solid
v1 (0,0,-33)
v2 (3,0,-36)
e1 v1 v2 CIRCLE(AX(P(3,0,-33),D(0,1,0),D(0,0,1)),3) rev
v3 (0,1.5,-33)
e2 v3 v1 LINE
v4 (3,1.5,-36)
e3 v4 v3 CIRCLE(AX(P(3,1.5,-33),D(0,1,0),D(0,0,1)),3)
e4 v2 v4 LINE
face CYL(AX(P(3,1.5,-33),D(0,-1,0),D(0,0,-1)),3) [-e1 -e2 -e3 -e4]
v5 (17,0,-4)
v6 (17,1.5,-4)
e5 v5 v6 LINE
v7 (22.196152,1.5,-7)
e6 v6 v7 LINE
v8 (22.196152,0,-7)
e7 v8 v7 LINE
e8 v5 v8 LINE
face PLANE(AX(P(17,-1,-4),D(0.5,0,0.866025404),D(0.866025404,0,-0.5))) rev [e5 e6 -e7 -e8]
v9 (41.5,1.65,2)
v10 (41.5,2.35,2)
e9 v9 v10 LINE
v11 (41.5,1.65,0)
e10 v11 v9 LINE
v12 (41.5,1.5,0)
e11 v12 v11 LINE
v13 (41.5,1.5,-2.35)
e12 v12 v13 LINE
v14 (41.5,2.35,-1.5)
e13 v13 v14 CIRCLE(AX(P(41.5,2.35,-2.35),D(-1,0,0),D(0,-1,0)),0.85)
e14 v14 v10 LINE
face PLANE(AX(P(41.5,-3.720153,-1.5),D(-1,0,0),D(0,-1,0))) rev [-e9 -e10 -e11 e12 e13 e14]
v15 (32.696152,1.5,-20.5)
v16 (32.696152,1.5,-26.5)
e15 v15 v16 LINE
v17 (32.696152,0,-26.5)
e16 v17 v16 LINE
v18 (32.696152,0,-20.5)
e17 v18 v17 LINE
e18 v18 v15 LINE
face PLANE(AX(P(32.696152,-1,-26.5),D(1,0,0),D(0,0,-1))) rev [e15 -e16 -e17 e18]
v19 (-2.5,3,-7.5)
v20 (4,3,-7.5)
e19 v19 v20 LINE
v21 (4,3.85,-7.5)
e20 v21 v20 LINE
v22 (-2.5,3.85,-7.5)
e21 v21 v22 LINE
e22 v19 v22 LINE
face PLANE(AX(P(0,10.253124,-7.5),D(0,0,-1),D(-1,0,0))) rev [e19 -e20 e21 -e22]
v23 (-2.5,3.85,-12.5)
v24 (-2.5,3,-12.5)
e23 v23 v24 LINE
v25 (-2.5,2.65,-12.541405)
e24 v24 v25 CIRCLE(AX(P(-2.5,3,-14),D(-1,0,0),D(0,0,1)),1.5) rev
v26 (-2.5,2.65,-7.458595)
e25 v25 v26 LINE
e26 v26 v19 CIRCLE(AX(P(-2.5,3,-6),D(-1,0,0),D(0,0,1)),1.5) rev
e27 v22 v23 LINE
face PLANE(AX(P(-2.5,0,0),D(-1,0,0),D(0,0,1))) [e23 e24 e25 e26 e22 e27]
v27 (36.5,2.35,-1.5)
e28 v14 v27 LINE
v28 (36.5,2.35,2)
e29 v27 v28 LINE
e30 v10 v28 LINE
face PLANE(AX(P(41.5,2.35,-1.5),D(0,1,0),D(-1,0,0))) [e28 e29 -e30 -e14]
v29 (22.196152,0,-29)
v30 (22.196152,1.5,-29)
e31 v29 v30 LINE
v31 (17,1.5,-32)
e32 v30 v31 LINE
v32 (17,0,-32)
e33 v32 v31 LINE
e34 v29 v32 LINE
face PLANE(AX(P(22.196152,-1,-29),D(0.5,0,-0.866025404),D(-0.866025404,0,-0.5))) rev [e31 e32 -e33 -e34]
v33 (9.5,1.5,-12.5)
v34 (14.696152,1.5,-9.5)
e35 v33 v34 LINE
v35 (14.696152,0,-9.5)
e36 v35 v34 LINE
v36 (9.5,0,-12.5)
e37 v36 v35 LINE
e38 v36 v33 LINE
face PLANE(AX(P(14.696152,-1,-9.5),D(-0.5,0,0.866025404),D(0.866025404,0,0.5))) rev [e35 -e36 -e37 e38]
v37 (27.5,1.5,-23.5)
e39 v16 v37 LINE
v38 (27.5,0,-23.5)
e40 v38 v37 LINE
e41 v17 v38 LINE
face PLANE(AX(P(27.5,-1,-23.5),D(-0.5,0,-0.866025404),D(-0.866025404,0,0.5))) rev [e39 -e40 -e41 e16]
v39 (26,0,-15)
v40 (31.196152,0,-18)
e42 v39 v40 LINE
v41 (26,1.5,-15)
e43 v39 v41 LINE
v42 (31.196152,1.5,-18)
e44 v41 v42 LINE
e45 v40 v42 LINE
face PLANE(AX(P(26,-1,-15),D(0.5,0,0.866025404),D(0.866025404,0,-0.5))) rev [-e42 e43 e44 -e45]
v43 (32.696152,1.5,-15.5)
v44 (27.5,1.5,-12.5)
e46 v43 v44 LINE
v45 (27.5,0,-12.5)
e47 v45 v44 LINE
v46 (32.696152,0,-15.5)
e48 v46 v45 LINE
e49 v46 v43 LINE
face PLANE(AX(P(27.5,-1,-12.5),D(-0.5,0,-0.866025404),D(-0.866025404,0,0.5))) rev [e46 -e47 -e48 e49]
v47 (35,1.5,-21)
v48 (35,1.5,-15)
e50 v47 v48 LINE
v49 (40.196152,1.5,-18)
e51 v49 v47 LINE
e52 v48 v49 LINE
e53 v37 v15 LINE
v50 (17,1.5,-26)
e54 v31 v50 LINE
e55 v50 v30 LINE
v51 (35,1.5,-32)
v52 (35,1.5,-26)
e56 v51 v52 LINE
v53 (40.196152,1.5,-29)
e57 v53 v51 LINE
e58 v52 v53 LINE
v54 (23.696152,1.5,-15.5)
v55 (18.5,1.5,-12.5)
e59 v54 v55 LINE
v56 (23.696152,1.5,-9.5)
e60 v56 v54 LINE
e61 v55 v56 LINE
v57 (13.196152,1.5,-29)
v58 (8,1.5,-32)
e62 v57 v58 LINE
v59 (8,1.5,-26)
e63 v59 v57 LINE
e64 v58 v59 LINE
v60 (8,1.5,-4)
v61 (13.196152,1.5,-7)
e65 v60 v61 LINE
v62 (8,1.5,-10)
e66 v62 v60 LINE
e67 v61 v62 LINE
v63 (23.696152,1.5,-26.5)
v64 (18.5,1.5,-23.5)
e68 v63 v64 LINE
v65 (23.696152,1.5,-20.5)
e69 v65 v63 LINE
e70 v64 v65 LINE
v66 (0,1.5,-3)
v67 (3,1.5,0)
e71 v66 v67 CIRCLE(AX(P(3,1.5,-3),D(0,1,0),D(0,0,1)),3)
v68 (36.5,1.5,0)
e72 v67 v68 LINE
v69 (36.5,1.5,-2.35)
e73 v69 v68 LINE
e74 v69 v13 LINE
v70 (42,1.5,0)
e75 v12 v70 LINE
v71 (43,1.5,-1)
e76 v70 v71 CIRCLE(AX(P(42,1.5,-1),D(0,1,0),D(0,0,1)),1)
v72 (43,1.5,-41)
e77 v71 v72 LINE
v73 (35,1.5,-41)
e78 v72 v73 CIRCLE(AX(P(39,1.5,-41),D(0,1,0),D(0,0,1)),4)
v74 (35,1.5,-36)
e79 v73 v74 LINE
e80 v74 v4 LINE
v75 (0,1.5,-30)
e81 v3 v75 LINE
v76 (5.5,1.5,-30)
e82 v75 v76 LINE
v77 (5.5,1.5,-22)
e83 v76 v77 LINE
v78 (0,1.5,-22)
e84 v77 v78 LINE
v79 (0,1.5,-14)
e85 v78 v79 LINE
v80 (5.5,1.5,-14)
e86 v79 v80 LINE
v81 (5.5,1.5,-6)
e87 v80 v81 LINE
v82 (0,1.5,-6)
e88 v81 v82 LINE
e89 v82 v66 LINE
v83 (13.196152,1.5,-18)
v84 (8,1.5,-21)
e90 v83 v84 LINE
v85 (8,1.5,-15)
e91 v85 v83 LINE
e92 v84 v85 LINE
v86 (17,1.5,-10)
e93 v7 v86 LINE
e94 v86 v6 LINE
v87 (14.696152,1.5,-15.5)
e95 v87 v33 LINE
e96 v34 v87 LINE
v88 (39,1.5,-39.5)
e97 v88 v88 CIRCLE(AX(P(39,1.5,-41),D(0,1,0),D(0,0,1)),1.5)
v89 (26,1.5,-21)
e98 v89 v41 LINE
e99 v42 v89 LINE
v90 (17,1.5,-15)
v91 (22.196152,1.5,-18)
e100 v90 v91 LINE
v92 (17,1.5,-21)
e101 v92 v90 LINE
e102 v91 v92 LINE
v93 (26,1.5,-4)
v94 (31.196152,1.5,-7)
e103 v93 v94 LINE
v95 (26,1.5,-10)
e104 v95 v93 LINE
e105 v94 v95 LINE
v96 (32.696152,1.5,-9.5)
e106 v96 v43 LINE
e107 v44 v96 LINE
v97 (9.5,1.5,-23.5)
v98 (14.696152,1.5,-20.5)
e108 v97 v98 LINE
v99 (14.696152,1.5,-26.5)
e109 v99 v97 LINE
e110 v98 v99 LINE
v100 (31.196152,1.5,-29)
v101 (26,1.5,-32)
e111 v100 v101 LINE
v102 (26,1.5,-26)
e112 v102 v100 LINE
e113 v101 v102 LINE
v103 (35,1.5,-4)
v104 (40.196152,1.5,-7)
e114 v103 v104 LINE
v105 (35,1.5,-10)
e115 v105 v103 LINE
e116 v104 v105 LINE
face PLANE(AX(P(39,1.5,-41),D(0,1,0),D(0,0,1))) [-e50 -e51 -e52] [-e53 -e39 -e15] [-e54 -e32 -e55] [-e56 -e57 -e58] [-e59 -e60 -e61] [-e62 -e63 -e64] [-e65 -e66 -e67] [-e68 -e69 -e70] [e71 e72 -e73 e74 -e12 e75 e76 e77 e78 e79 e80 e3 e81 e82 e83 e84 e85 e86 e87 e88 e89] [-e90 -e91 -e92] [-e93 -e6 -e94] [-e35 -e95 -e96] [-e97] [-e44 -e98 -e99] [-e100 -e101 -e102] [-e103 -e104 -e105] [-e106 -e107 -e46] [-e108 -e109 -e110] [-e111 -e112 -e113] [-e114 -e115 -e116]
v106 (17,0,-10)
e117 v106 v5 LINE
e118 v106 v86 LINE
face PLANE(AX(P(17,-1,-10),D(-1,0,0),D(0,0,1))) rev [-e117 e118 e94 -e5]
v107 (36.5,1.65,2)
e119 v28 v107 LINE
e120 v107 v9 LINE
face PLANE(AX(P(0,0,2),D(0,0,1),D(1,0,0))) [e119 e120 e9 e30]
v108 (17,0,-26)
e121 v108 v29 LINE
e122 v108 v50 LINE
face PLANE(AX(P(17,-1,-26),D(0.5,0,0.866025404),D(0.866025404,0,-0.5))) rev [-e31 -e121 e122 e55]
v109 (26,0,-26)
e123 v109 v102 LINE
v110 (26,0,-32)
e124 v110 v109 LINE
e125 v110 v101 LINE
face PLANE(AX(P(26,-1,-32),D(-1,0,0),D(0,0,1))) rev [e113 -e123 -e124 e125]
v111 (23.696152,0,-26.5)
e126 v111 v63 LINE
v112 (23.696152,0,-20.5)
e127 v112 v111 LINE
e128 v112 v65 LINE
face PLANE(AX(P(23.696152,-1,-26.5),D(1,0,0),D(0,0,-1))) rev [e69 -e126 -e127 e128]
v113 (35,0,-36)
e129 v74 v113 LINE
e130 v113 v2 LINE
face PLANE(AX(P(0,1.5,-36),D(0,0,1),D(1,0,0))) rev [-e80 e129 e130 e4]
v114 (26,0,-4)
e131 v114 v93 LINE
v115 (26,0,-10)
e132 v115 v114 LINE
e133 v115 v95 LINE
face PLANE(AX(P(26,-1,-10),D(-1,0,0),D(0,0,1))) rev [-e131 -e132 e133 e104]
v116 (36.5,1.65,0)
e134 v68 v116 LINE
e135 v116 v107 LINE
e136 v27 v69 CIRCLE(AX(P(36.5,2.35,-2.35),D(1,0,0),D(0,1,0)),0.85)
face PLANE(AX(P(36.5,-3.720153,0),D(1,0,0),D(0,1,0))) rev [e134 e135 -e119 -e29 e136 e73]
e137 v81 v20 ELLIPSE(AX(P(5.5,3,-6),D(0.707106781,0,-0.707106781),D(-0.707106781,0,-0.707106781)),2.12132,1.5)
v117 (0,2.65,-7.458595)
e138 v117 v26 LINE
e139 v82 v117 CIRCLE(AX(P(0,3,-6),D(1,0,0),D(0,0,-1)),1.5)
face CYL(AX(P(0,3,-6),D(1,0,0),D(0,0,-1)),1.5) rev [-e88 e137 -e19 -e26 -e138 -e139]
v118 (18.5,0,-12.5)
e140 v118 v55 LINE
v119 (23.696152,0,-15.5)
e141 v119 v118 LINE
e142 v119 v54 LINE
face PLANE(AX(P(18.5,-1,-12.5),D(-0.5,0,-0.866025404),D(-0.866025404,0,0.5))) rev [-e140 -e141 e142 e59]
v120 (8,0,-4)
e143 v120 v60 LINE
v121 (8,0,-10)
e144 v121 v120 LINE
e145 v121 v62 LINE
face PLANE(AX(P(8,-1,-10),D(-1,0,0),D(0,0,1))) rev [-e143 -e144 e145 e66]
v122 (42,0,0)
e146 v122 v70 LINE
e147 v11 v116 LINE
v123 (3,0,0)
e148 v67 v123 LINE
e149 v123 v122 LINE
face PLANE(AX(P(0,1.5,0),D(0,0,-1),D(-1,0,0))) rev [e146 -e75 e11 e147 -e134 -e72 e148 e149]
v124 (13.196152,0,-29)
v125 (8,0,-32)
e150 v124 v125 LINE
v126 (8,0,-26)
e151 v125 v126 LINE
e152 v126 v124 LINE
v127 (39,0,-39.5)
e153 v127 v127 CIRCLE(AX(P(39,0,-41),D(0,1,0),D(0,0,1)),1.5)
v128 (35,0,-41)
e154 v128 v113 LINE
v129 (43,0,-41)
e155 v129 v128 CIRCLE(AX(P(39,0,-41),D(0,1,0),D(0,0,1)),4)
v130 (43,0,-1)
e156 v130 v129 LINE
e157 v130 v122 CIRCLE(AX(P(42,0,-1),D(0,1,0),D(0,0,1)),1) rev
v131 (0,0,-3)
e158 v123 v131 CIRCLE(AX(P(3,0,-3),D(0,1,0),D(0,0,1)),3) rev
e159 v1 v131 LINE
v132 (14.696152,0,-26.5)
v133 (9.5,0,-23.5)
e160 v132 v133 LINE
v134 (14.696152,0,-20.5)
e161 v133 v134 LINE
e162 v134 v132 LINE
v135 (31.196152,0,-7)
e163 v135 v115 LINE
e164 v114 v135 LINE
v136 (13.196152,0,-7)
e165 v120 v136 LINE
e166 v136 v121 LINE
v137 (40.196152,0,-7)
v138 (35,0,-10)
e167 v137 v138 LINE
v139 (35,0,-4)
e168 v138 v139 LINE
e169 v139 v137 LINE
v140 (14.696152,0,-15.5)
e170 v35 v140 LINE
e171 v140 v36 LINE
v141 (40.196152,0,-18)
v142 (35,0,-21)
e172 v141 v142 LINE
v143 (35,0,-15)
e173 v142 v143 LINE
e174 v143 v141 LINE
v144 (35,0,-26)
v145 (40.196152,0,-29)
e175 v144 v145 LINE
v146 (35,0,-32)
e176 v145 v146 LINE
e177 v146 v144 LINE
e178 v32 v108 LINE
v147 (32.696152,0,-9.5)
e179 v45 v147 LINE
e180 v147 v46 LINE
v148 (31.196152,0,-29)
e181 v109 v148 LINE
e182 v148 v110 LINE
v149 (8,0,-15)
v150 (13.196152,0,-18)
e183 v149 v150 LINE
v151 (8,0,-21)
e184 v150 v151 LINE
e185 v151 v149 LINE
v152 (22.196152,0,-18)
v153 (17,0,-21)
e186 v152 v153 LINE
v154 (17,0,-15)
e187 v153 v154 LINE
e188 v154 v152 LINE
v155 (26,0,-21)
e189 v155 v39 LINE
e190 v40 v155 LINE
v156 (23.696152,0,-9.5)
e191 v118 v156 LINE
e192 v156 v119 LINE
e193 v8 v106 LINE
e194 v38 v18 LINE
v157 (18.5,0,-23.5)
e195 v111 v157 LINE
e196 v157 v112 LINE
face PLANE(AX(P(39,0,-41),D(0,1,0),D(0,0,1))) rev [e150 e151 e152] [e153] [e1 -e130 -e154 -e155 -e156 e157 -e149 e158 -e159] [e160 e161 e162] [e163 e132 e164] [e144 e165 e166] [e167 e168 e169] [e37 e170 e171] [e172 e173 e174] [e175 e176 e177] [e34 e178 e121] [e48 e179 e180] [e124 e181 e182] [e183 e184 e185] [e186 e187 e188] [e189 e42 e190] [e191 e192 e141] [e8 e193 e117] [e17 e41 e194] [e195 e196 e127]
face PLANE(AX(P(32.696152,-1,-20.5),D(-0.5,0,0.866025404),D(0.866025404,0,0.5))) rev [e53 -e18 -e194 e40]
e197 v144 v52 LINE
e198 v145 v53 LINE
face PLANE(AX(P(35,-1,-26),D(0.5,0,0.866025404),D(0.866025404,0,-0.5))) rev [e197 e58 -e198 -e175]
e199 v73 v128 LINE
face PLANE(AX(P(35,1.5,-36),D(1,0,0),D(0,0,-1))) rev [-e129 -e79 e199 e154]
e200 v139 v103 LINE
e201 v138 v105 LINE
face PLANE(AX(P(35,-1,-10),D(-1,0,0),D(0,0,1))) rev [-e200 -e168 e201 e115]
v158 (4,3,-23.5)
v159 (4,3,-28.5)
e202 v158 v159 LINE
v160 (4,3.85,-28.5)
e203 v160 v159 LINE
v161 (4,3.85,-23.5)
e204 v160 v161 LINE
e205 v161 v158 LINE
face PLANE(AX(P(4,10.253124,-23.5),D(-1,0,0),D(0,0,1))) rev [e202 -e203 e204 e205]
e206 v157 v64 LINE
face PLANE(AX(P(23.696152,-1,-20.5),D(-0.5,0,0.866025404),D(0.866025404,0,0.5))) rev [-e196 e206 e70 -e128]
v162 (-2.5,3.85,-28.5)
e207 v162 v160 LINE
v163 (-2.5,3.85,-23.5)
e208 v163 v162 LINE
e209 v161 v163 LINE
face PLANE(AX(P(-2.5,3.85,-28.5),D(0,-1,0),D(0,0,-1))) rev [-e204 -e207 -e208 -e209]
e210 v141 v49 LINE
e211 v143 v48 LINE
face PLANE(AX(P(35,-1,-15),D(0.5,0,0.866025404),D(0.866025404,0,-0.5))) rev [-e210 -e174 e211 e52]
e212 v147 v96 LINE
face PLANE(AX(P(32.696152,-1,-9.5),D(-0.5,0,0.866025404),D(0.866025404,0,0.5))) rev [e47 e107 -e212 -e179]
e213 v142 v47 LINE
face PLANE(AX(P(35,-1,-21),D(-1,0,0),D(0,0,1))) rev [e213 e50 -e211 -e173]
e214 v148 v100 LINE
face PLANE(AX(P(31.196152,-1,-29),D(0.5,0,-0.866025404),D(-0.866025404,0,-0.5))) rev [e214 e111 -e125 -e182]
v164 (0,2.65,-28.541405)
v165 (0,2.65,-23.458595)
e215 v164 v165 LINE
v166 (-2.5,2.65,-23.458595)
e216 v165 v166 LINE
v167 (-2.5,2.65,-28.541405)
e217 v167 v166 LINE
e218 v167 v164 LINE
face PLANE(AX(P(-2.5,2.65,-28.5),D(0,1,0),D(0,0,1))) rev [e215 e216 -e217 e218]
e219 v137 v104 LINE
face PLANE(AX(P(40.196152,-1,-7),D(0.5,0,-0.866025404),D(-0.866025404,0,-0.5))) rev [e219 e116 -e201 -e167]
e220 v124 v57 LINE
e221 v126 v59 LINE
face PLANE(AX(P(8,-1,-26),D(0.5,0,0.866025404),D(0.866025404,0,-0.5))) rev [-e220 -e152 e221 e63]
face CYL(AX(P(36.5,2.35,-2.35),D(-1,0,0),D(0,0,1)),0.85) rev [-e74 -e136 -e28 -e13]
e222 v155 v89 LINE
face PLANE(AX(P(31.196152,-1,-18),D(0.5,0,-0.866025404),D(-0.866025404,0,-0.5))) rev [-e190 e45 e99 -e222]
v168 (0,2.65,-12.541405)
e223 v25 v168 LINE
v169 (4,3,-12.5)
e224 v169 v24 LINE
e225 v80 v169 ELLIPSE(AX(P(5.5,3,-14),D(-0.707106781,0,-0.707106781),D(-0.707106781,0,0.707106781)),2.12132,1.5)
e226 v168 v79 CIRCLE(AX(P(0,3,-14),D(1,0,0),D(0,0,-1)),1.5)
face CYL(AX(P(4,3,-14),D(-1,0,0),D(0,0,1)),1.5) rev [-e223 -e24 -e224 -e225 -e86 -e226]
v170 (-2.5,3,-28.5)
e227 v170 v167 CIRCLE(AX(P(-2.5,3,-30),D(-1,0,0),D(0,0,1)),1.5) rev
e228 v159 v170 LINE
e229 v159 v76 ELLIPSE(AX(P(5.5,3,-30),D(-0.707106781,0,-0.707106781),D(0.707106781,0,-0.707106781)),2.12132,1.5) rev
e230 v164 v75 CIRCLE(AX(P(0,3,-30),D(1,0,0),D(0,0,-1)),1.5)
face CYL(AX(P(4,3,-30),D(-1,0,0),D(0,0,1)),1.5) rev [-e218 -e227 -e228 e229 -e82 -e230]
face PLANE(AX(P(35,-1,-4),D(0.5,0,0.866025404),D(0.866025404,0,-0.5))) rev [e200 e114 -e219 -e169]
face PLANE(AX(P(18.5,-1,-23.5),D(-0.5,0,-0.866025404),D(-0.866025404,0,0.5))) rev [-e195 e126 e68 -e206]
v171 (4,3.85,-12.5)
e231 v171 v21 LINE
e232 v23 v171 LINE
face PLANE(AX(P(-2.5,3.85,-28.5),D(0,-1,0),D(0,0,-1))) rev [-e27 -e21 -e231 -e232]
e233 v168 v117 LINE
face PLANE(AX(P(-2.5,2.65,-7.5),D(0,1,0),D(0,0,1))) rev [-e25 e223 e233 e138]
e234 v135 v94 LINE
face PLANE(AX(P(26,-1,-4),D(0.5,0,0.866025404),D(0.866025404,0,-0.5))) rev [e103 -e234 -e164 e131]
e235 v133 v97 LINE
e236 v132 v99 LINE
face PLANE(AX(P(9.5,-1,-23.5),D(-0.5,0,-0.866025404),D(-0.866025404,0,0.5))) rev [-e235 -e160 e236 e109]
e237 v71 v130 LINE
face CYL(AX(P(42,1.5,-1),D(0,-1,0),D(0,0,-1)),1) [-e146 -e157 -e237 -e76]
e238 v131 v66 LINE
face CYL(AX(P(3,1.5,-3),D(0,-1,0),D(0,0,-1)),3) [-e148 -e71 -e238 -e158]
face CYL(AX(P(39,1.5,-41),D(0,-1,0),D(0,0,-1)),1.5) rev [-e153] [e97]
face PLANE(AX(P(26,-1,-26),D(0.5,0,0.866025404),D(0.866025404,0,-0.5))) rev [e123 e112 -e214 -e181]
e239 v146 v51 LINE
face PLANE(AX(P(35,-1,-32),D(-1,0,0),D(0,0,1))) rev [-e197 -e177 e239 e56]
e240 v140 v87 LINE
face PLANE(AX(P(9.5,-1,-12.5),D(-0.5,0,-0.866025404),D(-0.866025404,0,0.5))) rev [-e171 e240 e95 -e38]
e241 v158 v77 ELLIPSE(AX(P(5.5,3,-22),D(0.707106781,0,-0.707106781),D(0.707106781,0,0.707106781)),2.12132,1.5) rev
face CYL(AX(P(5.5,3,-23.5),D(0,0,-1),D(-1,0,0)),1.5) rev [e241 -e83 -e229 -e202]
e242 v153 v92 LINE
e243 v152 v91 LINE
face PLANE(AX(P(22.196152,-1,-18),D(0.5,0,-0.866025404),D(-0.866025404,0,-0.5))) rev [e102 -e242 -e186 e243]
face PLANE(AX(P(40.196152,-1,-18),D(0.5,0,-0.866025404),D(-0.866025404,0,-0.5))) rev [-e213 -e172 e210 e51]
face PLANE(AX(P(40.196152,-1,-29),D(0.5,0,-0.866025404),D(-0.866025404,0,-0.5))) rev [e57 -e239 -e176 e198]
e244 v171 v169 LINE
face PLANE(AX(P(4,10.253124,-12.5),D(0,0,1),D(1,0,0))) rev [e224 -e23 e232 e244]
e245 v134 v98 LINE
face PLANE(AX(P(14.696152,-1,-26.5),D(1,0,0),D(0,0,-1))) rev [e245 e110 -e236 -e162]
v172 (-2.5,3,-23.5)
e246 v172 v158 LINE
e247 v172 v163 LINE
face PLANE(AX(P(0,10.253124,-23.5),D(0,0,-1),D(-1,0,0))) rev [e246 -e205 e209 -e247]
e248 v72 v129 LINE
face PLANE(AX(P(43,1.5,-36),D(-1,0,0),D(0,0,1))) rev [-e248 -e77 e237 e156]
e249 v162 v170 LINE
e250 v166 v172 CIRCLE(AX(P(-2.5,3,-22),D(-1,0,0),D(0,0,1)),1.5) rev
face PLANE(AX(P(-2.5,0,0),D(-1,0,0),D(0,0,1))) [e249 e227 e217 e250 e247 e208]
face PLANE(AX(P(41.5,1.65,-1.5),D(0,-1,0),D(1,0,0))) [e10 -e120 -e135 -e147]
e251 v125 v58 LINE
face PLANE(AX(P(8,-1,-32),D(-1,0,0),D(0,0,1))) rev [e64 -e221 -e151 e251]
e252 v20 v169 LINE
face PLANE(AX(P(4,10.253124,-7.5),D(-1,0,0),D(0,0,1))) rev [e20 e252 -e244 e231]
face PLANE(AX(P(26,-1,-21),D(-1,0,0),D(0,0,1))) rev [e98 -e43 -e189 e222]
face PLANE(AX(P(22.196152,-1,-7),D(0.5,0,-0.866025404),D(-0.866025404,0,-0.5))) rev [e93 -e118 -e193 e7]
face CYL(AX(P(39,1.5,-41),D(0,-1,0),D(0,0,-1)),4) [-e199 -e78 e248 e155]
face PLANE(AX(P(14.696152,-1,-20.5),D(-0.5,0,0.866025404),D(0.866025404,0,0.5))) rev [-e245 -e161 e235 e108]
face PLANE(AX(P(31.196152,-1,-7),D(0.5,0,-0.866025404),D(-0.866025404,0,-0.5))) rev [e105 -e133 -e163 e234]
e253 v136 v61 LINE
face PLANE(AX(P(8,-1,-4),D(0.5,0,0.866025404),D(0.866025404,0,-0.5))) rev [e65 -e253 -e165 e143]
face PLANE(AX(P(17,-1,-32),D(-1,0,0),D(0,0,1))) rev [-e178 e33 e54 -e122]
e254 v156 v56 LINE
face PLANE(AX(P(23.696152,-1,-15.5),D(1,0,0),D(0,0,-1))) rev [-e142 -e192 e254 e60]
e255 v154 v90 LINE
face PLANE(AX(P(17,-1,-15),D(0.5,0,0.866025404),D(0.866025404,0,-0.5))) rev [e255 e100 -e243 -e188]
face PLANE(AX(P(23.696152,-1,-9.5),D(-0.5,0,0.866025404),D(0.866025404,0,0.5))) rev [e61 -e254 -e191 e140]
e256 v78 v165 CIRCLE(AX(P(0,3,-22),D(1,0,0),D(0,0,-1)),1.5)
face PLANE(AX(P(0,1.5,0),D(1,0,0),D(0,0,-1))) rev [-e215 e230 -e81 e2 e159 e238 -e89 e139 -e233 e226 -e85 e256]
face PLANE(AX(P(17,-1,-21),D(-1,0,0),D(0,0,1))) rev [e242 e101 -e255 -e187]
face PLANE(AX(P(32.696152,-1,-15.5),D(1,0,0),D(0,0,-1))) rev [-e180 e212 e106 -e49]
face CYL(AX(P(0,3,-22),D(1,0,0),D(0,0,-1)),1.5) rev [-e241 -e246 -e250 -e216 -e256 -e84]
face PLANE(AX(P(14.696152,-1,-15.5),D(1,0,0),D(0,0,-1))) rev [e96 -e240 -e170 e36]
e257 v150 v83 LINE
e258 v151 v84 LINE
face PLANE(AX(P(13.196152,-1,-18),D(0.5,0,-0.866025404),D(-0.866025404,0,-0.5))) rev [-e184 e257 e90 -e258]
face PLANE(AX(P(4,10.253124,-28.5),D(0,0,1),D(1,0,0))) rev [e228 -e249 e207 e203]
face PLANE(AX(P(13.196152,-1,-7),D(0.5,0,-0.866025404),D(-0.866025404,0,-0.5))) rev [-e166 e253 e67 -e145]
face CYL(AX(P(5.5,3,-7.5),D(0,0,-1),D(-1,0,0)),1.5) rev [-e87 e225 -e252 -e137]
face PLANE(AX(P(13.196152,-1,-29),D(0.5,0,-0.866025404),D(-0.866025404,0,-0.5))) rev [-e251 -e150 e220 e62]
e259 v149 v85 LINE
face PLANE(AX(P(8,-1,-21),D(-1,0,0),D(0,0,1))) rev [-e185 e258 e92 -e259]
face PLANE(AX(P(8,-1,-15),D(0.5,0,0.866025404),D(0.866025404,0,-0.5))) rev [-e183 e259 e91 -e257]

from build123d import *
from OCP.BRepFilletAPI import BRepFilletAPI_MakeFillet

# Parameters (mm, degrees)
SKETCH1_R                = 1.5
BOSS_EXTRUDE1_DEPTH      = 1.5
BOSS_EXTRUDE2_DEPTH      = 2
BOSS_EXTRUDE2_DEPTH_BACK = 1.5
SKETCH3_W                = 5
SKETCH3_H                = 0.7
SKETCH4_W                = 5
SKETCH4_H                = 1.5
BOSS_EXTRUDE3_DEPTH      = 0.15
FILLET2_R                = 0.85
SKETCH5_W                = 5
SKETCH5_H                = 1.2
BOSS_EXTRUDE4_DEPTH      = 2.5
BOSS_EXTRUDE4_2_DEPTH    = 2.5
SKETCH6_W                = 4
SKETCH6_H                = 5
BOSS_EXTRUDE5_DEPTH      = 2.35
FILLET3_R                = 1.5
CUT_EXTRUDE1_DEPTH       = 2.5
FILLET4_R1               = 3
FILLET4_R2               = 1


with BuildPart() as part:
    # Sketch1 → Boss-Extrude1 (new body)
    with BuildSketch(Plane(origin=(0, 0, 0), x_dir=(1, 0, 0), z_dir=(0, 1, 0))):
        with BuildLine():
            Line((0, 0), (43, 0))
            Line((43, 0), (43, 36))
            Line((43, 36), (43, 41))
            ThreePointArc((43, 41), (39, 45), (35, 41))
            Line((35, 41), (35, 36))
            Line((35, 36), (0, 36))
            Line((0, 36), (0, 0))
        make_face()
        with Locations(Location((39, 41, 0), (0, 0, 270))):
            Circle(SKETCH1_R, mode=Mode.SUBTRACT)
    extrude(amount=BOSS_EXTRUDE1_DEPTH)



with BuildPart() as body_2:
    # Sketch3 → Boss-Extrude2 (new, two sides: drawn at the far end of the back side and taken through both)
    with BuildSketch(Plane.XY.offset(-BOSS_EXTRUDE2_DEPTH_BACK)):
        with Locations((39, 2)):
            Rectangle(SKETCH3_W, SKETCH3_H)
    extrude(amount=BOSS_EXTRUDE2_DEPTH + BOSS_EXTRUDE2_DEPTH_BACK)


with BuildPart() as part_1:
    add(part.part)

    add(body_2.part)  # Boss-Extrude3 merges body 2
    # Sketch4 → Boss-Extrude3 (add)
    with BuildSketch(Plane.XZ.offset(-1.65)):
        with Locations((39, -0.75)):
            Rectangle(SKETCH4_W, SKETCH4_H)
    extrude(amount=BOSS_EXTRUDE3_DEPTH)

    # Fillet2
    fillet2_edges = [part_1.edges().sort_by_distance(p)[0] for p in [
        (39, 1.5, -1.5),
    ]]
    fillet(fillet2_edges, radius=FILLET2_R - 0.0001)  # a hair under: the kernel refuses the full size



with BuildPart() as body_2_2:
    # Sketch5 → Boss-Extrude4 (new body)
    with BuildSketch(Plane.ZY):
        with Locations((-10, 3.25)):
            Rectangle(SKETCH5_W, SKETCH5_H)
    extrude(amount=BOSS_EXTRUDE4_DEPTH)


with BuildPart() as body_3:
    # Sketch5 → Boss-Extrude4 2 (new body)
    with BuildSketch(Plane.ZY):
        with Locations((-26, 3.25)):
            Rectangle(SKETCH5_W, SKETCH5_H)
    extrude(amount=BOSS_EXTRUDE4_2_DEPTH)


with BuildPart() as part_2:
    add(part_1.part)

    add(body_2_2.part)  # Boss-Extrude5 merges body 2 2

    add(body_3.part)  # Boss-Extrude5 merges body 3
    # Sketch6 → Boss-Extrude5 (add)
    with BuildSketch(Plane(origin=(0, 1.5, 0), x_dir=(1, 0, 0), z_dir=(0, 1, 0))):
        with Locations((2, 26)):
            Rectangle(SKETCH6_W, SKETCH6_H)
        with Locations((2, 10)):
            Rectangle(SKETCH6_W, SKETCH6_H)
    extrude(amount=BOSS_EXTRUDE5_DEPTH)

    # Fillet3
    fillet3_edges = [part_2.edges().sort_by_distance(p)[0] for p in [
        (2, 1.5, -7.5),
    ]]
    fillet(fillet3_edges, radius=FILLET3_R)
    fillet3_2_edges = [part_2.edges().sort_by_distance(p)[0] for p in [
        (4, 1.5, -10),
    ]]
    fillet(fillet3_2_edges, radius=FILLET3_R)
    fillet3_3_edges = [part_2.edges().sort_by_distance(p)[0] for p in [
        (2, 1.5, -12.5),
    ]]
    fillet(fillet3_3_edges, radius=FILLET3_R)
    fillet3_4_edges = [part_2.edges().sort_by_distance(p)[0] for p in [
        (2, 1.5, -23.5),
    ]]
    fillet(fillet3_4_edges, radius=FILLET3_R)
    fillet3_5_edges = [part_2.edges().sort_by_distance(p)[0] for p in [
        (4, 1.5, -26),
    ]]
    fillet(fillet3_5_edges, radius=FILLET3_R - 0.0001)  # a hair under: the kernel refuses the full size
    fillet3_6_edges = [part_2.edges().sort_by_distance(p)[0] for p in [
        (2, 1.5, -28.5),
    ]]
    fillet(fillet3_6_edges, radius=FILLET3_R - 0.0001)  # a hair under: the kernel refuses the full size

    # Sketch7 → Cut-Extrude1 (cut)
    with BuildSketch(Plane(origin=(0, 1.5, 0), x_dir=(1, 0, 0), z_dir=(0, 1, 0))):
        Polygon((13.196152423, 29), (8, 32), (8, 26), align=None)
        Polygon((17, 26), (22.196152423, 29), (17, 32), align=None)
        Polygon((26, 26), (31.196152423, 29), (26, 32), align=None)
        Polygon((35, 26), (40.196152423, 29), (35, 32), align=None)
        Polygon((13.196152423, 18), (8, 21), (8, 15), align=None)
        Polygon((17, 15), (22.196152423, 18), (17, 21), align=None)
        Polygon((26, 15), (31.196152423, 18), (26, 21), align=None)
        Polygon((35, 15), (40.196152423, 18), (35, 21), align=None)
        Polygon((13.196152423, 7), (8, 10), (8, 4), align=None)
        Polygon((17, 4), (22.196152423, 7), (17, 10), align=None)
        Polygon((26, 4), (31.196152423, 7), (26, 10), align=None)
        Polygon((35, 4), (40.196152423, 7), (35, 10), align=None)
        Polygon((9.5, 23.5), (14.696152423, 26.5), (14.696152423, 20.5), align=None)
        Polygon((23.696152423, 20.5), (18.5, 23.5), (23.696152423, 26.5), align=None)
        Polygon((32.696152423, 20.5), (27.5, 23.5), (32.696152423, 26.5), align=None)
        Polygon((14.696152423, 9.5), (9.5, 12.5), (14.696152423, 15.5), align=None)
        Polygon((18.5, 12.5), (23.696152423, 15.5), (23.696152423, 9.5), align=None)
        Polygon((32.696152423, 9.5), (27.5, 12.5), (32.696152423, 15.5), align=None)
    extrude(amount=-CUT_EXTRUDE1_DEPTH, mode=Mode.SUBTRACT)

    # Fillet4: one fillet with a radius per group of edges: ONE call of the kernel's fillet builder (fillet() takes one radius for all edges)
    fillet4_edges_1 = [part_2.edges().sort_by_distance(p)[0] for p in [
        (0, 0.75, 0),
        (0, 0.75, -36),
    ]]
    fillet4_edges_2 = [part_2.edges().sort_by_distance(p)[0] for p in [
        (43, 0.75, 0),
    ]]
    fillet4 = BRepFilletAPI_MakeFillet(part_2.part.solid().wrapped)
    for e in fillet4_edges_1:
        fillet4.Add(FILLET4_R1, e.wrapped)
    for e in fillet4_edges_2:
        fillet4.Add(FILLET4_R2, e.wrapped)
    add(Compound.cast(fillet4.Shape()), mode=Mode.REPLACE)


solid = part_2.part
